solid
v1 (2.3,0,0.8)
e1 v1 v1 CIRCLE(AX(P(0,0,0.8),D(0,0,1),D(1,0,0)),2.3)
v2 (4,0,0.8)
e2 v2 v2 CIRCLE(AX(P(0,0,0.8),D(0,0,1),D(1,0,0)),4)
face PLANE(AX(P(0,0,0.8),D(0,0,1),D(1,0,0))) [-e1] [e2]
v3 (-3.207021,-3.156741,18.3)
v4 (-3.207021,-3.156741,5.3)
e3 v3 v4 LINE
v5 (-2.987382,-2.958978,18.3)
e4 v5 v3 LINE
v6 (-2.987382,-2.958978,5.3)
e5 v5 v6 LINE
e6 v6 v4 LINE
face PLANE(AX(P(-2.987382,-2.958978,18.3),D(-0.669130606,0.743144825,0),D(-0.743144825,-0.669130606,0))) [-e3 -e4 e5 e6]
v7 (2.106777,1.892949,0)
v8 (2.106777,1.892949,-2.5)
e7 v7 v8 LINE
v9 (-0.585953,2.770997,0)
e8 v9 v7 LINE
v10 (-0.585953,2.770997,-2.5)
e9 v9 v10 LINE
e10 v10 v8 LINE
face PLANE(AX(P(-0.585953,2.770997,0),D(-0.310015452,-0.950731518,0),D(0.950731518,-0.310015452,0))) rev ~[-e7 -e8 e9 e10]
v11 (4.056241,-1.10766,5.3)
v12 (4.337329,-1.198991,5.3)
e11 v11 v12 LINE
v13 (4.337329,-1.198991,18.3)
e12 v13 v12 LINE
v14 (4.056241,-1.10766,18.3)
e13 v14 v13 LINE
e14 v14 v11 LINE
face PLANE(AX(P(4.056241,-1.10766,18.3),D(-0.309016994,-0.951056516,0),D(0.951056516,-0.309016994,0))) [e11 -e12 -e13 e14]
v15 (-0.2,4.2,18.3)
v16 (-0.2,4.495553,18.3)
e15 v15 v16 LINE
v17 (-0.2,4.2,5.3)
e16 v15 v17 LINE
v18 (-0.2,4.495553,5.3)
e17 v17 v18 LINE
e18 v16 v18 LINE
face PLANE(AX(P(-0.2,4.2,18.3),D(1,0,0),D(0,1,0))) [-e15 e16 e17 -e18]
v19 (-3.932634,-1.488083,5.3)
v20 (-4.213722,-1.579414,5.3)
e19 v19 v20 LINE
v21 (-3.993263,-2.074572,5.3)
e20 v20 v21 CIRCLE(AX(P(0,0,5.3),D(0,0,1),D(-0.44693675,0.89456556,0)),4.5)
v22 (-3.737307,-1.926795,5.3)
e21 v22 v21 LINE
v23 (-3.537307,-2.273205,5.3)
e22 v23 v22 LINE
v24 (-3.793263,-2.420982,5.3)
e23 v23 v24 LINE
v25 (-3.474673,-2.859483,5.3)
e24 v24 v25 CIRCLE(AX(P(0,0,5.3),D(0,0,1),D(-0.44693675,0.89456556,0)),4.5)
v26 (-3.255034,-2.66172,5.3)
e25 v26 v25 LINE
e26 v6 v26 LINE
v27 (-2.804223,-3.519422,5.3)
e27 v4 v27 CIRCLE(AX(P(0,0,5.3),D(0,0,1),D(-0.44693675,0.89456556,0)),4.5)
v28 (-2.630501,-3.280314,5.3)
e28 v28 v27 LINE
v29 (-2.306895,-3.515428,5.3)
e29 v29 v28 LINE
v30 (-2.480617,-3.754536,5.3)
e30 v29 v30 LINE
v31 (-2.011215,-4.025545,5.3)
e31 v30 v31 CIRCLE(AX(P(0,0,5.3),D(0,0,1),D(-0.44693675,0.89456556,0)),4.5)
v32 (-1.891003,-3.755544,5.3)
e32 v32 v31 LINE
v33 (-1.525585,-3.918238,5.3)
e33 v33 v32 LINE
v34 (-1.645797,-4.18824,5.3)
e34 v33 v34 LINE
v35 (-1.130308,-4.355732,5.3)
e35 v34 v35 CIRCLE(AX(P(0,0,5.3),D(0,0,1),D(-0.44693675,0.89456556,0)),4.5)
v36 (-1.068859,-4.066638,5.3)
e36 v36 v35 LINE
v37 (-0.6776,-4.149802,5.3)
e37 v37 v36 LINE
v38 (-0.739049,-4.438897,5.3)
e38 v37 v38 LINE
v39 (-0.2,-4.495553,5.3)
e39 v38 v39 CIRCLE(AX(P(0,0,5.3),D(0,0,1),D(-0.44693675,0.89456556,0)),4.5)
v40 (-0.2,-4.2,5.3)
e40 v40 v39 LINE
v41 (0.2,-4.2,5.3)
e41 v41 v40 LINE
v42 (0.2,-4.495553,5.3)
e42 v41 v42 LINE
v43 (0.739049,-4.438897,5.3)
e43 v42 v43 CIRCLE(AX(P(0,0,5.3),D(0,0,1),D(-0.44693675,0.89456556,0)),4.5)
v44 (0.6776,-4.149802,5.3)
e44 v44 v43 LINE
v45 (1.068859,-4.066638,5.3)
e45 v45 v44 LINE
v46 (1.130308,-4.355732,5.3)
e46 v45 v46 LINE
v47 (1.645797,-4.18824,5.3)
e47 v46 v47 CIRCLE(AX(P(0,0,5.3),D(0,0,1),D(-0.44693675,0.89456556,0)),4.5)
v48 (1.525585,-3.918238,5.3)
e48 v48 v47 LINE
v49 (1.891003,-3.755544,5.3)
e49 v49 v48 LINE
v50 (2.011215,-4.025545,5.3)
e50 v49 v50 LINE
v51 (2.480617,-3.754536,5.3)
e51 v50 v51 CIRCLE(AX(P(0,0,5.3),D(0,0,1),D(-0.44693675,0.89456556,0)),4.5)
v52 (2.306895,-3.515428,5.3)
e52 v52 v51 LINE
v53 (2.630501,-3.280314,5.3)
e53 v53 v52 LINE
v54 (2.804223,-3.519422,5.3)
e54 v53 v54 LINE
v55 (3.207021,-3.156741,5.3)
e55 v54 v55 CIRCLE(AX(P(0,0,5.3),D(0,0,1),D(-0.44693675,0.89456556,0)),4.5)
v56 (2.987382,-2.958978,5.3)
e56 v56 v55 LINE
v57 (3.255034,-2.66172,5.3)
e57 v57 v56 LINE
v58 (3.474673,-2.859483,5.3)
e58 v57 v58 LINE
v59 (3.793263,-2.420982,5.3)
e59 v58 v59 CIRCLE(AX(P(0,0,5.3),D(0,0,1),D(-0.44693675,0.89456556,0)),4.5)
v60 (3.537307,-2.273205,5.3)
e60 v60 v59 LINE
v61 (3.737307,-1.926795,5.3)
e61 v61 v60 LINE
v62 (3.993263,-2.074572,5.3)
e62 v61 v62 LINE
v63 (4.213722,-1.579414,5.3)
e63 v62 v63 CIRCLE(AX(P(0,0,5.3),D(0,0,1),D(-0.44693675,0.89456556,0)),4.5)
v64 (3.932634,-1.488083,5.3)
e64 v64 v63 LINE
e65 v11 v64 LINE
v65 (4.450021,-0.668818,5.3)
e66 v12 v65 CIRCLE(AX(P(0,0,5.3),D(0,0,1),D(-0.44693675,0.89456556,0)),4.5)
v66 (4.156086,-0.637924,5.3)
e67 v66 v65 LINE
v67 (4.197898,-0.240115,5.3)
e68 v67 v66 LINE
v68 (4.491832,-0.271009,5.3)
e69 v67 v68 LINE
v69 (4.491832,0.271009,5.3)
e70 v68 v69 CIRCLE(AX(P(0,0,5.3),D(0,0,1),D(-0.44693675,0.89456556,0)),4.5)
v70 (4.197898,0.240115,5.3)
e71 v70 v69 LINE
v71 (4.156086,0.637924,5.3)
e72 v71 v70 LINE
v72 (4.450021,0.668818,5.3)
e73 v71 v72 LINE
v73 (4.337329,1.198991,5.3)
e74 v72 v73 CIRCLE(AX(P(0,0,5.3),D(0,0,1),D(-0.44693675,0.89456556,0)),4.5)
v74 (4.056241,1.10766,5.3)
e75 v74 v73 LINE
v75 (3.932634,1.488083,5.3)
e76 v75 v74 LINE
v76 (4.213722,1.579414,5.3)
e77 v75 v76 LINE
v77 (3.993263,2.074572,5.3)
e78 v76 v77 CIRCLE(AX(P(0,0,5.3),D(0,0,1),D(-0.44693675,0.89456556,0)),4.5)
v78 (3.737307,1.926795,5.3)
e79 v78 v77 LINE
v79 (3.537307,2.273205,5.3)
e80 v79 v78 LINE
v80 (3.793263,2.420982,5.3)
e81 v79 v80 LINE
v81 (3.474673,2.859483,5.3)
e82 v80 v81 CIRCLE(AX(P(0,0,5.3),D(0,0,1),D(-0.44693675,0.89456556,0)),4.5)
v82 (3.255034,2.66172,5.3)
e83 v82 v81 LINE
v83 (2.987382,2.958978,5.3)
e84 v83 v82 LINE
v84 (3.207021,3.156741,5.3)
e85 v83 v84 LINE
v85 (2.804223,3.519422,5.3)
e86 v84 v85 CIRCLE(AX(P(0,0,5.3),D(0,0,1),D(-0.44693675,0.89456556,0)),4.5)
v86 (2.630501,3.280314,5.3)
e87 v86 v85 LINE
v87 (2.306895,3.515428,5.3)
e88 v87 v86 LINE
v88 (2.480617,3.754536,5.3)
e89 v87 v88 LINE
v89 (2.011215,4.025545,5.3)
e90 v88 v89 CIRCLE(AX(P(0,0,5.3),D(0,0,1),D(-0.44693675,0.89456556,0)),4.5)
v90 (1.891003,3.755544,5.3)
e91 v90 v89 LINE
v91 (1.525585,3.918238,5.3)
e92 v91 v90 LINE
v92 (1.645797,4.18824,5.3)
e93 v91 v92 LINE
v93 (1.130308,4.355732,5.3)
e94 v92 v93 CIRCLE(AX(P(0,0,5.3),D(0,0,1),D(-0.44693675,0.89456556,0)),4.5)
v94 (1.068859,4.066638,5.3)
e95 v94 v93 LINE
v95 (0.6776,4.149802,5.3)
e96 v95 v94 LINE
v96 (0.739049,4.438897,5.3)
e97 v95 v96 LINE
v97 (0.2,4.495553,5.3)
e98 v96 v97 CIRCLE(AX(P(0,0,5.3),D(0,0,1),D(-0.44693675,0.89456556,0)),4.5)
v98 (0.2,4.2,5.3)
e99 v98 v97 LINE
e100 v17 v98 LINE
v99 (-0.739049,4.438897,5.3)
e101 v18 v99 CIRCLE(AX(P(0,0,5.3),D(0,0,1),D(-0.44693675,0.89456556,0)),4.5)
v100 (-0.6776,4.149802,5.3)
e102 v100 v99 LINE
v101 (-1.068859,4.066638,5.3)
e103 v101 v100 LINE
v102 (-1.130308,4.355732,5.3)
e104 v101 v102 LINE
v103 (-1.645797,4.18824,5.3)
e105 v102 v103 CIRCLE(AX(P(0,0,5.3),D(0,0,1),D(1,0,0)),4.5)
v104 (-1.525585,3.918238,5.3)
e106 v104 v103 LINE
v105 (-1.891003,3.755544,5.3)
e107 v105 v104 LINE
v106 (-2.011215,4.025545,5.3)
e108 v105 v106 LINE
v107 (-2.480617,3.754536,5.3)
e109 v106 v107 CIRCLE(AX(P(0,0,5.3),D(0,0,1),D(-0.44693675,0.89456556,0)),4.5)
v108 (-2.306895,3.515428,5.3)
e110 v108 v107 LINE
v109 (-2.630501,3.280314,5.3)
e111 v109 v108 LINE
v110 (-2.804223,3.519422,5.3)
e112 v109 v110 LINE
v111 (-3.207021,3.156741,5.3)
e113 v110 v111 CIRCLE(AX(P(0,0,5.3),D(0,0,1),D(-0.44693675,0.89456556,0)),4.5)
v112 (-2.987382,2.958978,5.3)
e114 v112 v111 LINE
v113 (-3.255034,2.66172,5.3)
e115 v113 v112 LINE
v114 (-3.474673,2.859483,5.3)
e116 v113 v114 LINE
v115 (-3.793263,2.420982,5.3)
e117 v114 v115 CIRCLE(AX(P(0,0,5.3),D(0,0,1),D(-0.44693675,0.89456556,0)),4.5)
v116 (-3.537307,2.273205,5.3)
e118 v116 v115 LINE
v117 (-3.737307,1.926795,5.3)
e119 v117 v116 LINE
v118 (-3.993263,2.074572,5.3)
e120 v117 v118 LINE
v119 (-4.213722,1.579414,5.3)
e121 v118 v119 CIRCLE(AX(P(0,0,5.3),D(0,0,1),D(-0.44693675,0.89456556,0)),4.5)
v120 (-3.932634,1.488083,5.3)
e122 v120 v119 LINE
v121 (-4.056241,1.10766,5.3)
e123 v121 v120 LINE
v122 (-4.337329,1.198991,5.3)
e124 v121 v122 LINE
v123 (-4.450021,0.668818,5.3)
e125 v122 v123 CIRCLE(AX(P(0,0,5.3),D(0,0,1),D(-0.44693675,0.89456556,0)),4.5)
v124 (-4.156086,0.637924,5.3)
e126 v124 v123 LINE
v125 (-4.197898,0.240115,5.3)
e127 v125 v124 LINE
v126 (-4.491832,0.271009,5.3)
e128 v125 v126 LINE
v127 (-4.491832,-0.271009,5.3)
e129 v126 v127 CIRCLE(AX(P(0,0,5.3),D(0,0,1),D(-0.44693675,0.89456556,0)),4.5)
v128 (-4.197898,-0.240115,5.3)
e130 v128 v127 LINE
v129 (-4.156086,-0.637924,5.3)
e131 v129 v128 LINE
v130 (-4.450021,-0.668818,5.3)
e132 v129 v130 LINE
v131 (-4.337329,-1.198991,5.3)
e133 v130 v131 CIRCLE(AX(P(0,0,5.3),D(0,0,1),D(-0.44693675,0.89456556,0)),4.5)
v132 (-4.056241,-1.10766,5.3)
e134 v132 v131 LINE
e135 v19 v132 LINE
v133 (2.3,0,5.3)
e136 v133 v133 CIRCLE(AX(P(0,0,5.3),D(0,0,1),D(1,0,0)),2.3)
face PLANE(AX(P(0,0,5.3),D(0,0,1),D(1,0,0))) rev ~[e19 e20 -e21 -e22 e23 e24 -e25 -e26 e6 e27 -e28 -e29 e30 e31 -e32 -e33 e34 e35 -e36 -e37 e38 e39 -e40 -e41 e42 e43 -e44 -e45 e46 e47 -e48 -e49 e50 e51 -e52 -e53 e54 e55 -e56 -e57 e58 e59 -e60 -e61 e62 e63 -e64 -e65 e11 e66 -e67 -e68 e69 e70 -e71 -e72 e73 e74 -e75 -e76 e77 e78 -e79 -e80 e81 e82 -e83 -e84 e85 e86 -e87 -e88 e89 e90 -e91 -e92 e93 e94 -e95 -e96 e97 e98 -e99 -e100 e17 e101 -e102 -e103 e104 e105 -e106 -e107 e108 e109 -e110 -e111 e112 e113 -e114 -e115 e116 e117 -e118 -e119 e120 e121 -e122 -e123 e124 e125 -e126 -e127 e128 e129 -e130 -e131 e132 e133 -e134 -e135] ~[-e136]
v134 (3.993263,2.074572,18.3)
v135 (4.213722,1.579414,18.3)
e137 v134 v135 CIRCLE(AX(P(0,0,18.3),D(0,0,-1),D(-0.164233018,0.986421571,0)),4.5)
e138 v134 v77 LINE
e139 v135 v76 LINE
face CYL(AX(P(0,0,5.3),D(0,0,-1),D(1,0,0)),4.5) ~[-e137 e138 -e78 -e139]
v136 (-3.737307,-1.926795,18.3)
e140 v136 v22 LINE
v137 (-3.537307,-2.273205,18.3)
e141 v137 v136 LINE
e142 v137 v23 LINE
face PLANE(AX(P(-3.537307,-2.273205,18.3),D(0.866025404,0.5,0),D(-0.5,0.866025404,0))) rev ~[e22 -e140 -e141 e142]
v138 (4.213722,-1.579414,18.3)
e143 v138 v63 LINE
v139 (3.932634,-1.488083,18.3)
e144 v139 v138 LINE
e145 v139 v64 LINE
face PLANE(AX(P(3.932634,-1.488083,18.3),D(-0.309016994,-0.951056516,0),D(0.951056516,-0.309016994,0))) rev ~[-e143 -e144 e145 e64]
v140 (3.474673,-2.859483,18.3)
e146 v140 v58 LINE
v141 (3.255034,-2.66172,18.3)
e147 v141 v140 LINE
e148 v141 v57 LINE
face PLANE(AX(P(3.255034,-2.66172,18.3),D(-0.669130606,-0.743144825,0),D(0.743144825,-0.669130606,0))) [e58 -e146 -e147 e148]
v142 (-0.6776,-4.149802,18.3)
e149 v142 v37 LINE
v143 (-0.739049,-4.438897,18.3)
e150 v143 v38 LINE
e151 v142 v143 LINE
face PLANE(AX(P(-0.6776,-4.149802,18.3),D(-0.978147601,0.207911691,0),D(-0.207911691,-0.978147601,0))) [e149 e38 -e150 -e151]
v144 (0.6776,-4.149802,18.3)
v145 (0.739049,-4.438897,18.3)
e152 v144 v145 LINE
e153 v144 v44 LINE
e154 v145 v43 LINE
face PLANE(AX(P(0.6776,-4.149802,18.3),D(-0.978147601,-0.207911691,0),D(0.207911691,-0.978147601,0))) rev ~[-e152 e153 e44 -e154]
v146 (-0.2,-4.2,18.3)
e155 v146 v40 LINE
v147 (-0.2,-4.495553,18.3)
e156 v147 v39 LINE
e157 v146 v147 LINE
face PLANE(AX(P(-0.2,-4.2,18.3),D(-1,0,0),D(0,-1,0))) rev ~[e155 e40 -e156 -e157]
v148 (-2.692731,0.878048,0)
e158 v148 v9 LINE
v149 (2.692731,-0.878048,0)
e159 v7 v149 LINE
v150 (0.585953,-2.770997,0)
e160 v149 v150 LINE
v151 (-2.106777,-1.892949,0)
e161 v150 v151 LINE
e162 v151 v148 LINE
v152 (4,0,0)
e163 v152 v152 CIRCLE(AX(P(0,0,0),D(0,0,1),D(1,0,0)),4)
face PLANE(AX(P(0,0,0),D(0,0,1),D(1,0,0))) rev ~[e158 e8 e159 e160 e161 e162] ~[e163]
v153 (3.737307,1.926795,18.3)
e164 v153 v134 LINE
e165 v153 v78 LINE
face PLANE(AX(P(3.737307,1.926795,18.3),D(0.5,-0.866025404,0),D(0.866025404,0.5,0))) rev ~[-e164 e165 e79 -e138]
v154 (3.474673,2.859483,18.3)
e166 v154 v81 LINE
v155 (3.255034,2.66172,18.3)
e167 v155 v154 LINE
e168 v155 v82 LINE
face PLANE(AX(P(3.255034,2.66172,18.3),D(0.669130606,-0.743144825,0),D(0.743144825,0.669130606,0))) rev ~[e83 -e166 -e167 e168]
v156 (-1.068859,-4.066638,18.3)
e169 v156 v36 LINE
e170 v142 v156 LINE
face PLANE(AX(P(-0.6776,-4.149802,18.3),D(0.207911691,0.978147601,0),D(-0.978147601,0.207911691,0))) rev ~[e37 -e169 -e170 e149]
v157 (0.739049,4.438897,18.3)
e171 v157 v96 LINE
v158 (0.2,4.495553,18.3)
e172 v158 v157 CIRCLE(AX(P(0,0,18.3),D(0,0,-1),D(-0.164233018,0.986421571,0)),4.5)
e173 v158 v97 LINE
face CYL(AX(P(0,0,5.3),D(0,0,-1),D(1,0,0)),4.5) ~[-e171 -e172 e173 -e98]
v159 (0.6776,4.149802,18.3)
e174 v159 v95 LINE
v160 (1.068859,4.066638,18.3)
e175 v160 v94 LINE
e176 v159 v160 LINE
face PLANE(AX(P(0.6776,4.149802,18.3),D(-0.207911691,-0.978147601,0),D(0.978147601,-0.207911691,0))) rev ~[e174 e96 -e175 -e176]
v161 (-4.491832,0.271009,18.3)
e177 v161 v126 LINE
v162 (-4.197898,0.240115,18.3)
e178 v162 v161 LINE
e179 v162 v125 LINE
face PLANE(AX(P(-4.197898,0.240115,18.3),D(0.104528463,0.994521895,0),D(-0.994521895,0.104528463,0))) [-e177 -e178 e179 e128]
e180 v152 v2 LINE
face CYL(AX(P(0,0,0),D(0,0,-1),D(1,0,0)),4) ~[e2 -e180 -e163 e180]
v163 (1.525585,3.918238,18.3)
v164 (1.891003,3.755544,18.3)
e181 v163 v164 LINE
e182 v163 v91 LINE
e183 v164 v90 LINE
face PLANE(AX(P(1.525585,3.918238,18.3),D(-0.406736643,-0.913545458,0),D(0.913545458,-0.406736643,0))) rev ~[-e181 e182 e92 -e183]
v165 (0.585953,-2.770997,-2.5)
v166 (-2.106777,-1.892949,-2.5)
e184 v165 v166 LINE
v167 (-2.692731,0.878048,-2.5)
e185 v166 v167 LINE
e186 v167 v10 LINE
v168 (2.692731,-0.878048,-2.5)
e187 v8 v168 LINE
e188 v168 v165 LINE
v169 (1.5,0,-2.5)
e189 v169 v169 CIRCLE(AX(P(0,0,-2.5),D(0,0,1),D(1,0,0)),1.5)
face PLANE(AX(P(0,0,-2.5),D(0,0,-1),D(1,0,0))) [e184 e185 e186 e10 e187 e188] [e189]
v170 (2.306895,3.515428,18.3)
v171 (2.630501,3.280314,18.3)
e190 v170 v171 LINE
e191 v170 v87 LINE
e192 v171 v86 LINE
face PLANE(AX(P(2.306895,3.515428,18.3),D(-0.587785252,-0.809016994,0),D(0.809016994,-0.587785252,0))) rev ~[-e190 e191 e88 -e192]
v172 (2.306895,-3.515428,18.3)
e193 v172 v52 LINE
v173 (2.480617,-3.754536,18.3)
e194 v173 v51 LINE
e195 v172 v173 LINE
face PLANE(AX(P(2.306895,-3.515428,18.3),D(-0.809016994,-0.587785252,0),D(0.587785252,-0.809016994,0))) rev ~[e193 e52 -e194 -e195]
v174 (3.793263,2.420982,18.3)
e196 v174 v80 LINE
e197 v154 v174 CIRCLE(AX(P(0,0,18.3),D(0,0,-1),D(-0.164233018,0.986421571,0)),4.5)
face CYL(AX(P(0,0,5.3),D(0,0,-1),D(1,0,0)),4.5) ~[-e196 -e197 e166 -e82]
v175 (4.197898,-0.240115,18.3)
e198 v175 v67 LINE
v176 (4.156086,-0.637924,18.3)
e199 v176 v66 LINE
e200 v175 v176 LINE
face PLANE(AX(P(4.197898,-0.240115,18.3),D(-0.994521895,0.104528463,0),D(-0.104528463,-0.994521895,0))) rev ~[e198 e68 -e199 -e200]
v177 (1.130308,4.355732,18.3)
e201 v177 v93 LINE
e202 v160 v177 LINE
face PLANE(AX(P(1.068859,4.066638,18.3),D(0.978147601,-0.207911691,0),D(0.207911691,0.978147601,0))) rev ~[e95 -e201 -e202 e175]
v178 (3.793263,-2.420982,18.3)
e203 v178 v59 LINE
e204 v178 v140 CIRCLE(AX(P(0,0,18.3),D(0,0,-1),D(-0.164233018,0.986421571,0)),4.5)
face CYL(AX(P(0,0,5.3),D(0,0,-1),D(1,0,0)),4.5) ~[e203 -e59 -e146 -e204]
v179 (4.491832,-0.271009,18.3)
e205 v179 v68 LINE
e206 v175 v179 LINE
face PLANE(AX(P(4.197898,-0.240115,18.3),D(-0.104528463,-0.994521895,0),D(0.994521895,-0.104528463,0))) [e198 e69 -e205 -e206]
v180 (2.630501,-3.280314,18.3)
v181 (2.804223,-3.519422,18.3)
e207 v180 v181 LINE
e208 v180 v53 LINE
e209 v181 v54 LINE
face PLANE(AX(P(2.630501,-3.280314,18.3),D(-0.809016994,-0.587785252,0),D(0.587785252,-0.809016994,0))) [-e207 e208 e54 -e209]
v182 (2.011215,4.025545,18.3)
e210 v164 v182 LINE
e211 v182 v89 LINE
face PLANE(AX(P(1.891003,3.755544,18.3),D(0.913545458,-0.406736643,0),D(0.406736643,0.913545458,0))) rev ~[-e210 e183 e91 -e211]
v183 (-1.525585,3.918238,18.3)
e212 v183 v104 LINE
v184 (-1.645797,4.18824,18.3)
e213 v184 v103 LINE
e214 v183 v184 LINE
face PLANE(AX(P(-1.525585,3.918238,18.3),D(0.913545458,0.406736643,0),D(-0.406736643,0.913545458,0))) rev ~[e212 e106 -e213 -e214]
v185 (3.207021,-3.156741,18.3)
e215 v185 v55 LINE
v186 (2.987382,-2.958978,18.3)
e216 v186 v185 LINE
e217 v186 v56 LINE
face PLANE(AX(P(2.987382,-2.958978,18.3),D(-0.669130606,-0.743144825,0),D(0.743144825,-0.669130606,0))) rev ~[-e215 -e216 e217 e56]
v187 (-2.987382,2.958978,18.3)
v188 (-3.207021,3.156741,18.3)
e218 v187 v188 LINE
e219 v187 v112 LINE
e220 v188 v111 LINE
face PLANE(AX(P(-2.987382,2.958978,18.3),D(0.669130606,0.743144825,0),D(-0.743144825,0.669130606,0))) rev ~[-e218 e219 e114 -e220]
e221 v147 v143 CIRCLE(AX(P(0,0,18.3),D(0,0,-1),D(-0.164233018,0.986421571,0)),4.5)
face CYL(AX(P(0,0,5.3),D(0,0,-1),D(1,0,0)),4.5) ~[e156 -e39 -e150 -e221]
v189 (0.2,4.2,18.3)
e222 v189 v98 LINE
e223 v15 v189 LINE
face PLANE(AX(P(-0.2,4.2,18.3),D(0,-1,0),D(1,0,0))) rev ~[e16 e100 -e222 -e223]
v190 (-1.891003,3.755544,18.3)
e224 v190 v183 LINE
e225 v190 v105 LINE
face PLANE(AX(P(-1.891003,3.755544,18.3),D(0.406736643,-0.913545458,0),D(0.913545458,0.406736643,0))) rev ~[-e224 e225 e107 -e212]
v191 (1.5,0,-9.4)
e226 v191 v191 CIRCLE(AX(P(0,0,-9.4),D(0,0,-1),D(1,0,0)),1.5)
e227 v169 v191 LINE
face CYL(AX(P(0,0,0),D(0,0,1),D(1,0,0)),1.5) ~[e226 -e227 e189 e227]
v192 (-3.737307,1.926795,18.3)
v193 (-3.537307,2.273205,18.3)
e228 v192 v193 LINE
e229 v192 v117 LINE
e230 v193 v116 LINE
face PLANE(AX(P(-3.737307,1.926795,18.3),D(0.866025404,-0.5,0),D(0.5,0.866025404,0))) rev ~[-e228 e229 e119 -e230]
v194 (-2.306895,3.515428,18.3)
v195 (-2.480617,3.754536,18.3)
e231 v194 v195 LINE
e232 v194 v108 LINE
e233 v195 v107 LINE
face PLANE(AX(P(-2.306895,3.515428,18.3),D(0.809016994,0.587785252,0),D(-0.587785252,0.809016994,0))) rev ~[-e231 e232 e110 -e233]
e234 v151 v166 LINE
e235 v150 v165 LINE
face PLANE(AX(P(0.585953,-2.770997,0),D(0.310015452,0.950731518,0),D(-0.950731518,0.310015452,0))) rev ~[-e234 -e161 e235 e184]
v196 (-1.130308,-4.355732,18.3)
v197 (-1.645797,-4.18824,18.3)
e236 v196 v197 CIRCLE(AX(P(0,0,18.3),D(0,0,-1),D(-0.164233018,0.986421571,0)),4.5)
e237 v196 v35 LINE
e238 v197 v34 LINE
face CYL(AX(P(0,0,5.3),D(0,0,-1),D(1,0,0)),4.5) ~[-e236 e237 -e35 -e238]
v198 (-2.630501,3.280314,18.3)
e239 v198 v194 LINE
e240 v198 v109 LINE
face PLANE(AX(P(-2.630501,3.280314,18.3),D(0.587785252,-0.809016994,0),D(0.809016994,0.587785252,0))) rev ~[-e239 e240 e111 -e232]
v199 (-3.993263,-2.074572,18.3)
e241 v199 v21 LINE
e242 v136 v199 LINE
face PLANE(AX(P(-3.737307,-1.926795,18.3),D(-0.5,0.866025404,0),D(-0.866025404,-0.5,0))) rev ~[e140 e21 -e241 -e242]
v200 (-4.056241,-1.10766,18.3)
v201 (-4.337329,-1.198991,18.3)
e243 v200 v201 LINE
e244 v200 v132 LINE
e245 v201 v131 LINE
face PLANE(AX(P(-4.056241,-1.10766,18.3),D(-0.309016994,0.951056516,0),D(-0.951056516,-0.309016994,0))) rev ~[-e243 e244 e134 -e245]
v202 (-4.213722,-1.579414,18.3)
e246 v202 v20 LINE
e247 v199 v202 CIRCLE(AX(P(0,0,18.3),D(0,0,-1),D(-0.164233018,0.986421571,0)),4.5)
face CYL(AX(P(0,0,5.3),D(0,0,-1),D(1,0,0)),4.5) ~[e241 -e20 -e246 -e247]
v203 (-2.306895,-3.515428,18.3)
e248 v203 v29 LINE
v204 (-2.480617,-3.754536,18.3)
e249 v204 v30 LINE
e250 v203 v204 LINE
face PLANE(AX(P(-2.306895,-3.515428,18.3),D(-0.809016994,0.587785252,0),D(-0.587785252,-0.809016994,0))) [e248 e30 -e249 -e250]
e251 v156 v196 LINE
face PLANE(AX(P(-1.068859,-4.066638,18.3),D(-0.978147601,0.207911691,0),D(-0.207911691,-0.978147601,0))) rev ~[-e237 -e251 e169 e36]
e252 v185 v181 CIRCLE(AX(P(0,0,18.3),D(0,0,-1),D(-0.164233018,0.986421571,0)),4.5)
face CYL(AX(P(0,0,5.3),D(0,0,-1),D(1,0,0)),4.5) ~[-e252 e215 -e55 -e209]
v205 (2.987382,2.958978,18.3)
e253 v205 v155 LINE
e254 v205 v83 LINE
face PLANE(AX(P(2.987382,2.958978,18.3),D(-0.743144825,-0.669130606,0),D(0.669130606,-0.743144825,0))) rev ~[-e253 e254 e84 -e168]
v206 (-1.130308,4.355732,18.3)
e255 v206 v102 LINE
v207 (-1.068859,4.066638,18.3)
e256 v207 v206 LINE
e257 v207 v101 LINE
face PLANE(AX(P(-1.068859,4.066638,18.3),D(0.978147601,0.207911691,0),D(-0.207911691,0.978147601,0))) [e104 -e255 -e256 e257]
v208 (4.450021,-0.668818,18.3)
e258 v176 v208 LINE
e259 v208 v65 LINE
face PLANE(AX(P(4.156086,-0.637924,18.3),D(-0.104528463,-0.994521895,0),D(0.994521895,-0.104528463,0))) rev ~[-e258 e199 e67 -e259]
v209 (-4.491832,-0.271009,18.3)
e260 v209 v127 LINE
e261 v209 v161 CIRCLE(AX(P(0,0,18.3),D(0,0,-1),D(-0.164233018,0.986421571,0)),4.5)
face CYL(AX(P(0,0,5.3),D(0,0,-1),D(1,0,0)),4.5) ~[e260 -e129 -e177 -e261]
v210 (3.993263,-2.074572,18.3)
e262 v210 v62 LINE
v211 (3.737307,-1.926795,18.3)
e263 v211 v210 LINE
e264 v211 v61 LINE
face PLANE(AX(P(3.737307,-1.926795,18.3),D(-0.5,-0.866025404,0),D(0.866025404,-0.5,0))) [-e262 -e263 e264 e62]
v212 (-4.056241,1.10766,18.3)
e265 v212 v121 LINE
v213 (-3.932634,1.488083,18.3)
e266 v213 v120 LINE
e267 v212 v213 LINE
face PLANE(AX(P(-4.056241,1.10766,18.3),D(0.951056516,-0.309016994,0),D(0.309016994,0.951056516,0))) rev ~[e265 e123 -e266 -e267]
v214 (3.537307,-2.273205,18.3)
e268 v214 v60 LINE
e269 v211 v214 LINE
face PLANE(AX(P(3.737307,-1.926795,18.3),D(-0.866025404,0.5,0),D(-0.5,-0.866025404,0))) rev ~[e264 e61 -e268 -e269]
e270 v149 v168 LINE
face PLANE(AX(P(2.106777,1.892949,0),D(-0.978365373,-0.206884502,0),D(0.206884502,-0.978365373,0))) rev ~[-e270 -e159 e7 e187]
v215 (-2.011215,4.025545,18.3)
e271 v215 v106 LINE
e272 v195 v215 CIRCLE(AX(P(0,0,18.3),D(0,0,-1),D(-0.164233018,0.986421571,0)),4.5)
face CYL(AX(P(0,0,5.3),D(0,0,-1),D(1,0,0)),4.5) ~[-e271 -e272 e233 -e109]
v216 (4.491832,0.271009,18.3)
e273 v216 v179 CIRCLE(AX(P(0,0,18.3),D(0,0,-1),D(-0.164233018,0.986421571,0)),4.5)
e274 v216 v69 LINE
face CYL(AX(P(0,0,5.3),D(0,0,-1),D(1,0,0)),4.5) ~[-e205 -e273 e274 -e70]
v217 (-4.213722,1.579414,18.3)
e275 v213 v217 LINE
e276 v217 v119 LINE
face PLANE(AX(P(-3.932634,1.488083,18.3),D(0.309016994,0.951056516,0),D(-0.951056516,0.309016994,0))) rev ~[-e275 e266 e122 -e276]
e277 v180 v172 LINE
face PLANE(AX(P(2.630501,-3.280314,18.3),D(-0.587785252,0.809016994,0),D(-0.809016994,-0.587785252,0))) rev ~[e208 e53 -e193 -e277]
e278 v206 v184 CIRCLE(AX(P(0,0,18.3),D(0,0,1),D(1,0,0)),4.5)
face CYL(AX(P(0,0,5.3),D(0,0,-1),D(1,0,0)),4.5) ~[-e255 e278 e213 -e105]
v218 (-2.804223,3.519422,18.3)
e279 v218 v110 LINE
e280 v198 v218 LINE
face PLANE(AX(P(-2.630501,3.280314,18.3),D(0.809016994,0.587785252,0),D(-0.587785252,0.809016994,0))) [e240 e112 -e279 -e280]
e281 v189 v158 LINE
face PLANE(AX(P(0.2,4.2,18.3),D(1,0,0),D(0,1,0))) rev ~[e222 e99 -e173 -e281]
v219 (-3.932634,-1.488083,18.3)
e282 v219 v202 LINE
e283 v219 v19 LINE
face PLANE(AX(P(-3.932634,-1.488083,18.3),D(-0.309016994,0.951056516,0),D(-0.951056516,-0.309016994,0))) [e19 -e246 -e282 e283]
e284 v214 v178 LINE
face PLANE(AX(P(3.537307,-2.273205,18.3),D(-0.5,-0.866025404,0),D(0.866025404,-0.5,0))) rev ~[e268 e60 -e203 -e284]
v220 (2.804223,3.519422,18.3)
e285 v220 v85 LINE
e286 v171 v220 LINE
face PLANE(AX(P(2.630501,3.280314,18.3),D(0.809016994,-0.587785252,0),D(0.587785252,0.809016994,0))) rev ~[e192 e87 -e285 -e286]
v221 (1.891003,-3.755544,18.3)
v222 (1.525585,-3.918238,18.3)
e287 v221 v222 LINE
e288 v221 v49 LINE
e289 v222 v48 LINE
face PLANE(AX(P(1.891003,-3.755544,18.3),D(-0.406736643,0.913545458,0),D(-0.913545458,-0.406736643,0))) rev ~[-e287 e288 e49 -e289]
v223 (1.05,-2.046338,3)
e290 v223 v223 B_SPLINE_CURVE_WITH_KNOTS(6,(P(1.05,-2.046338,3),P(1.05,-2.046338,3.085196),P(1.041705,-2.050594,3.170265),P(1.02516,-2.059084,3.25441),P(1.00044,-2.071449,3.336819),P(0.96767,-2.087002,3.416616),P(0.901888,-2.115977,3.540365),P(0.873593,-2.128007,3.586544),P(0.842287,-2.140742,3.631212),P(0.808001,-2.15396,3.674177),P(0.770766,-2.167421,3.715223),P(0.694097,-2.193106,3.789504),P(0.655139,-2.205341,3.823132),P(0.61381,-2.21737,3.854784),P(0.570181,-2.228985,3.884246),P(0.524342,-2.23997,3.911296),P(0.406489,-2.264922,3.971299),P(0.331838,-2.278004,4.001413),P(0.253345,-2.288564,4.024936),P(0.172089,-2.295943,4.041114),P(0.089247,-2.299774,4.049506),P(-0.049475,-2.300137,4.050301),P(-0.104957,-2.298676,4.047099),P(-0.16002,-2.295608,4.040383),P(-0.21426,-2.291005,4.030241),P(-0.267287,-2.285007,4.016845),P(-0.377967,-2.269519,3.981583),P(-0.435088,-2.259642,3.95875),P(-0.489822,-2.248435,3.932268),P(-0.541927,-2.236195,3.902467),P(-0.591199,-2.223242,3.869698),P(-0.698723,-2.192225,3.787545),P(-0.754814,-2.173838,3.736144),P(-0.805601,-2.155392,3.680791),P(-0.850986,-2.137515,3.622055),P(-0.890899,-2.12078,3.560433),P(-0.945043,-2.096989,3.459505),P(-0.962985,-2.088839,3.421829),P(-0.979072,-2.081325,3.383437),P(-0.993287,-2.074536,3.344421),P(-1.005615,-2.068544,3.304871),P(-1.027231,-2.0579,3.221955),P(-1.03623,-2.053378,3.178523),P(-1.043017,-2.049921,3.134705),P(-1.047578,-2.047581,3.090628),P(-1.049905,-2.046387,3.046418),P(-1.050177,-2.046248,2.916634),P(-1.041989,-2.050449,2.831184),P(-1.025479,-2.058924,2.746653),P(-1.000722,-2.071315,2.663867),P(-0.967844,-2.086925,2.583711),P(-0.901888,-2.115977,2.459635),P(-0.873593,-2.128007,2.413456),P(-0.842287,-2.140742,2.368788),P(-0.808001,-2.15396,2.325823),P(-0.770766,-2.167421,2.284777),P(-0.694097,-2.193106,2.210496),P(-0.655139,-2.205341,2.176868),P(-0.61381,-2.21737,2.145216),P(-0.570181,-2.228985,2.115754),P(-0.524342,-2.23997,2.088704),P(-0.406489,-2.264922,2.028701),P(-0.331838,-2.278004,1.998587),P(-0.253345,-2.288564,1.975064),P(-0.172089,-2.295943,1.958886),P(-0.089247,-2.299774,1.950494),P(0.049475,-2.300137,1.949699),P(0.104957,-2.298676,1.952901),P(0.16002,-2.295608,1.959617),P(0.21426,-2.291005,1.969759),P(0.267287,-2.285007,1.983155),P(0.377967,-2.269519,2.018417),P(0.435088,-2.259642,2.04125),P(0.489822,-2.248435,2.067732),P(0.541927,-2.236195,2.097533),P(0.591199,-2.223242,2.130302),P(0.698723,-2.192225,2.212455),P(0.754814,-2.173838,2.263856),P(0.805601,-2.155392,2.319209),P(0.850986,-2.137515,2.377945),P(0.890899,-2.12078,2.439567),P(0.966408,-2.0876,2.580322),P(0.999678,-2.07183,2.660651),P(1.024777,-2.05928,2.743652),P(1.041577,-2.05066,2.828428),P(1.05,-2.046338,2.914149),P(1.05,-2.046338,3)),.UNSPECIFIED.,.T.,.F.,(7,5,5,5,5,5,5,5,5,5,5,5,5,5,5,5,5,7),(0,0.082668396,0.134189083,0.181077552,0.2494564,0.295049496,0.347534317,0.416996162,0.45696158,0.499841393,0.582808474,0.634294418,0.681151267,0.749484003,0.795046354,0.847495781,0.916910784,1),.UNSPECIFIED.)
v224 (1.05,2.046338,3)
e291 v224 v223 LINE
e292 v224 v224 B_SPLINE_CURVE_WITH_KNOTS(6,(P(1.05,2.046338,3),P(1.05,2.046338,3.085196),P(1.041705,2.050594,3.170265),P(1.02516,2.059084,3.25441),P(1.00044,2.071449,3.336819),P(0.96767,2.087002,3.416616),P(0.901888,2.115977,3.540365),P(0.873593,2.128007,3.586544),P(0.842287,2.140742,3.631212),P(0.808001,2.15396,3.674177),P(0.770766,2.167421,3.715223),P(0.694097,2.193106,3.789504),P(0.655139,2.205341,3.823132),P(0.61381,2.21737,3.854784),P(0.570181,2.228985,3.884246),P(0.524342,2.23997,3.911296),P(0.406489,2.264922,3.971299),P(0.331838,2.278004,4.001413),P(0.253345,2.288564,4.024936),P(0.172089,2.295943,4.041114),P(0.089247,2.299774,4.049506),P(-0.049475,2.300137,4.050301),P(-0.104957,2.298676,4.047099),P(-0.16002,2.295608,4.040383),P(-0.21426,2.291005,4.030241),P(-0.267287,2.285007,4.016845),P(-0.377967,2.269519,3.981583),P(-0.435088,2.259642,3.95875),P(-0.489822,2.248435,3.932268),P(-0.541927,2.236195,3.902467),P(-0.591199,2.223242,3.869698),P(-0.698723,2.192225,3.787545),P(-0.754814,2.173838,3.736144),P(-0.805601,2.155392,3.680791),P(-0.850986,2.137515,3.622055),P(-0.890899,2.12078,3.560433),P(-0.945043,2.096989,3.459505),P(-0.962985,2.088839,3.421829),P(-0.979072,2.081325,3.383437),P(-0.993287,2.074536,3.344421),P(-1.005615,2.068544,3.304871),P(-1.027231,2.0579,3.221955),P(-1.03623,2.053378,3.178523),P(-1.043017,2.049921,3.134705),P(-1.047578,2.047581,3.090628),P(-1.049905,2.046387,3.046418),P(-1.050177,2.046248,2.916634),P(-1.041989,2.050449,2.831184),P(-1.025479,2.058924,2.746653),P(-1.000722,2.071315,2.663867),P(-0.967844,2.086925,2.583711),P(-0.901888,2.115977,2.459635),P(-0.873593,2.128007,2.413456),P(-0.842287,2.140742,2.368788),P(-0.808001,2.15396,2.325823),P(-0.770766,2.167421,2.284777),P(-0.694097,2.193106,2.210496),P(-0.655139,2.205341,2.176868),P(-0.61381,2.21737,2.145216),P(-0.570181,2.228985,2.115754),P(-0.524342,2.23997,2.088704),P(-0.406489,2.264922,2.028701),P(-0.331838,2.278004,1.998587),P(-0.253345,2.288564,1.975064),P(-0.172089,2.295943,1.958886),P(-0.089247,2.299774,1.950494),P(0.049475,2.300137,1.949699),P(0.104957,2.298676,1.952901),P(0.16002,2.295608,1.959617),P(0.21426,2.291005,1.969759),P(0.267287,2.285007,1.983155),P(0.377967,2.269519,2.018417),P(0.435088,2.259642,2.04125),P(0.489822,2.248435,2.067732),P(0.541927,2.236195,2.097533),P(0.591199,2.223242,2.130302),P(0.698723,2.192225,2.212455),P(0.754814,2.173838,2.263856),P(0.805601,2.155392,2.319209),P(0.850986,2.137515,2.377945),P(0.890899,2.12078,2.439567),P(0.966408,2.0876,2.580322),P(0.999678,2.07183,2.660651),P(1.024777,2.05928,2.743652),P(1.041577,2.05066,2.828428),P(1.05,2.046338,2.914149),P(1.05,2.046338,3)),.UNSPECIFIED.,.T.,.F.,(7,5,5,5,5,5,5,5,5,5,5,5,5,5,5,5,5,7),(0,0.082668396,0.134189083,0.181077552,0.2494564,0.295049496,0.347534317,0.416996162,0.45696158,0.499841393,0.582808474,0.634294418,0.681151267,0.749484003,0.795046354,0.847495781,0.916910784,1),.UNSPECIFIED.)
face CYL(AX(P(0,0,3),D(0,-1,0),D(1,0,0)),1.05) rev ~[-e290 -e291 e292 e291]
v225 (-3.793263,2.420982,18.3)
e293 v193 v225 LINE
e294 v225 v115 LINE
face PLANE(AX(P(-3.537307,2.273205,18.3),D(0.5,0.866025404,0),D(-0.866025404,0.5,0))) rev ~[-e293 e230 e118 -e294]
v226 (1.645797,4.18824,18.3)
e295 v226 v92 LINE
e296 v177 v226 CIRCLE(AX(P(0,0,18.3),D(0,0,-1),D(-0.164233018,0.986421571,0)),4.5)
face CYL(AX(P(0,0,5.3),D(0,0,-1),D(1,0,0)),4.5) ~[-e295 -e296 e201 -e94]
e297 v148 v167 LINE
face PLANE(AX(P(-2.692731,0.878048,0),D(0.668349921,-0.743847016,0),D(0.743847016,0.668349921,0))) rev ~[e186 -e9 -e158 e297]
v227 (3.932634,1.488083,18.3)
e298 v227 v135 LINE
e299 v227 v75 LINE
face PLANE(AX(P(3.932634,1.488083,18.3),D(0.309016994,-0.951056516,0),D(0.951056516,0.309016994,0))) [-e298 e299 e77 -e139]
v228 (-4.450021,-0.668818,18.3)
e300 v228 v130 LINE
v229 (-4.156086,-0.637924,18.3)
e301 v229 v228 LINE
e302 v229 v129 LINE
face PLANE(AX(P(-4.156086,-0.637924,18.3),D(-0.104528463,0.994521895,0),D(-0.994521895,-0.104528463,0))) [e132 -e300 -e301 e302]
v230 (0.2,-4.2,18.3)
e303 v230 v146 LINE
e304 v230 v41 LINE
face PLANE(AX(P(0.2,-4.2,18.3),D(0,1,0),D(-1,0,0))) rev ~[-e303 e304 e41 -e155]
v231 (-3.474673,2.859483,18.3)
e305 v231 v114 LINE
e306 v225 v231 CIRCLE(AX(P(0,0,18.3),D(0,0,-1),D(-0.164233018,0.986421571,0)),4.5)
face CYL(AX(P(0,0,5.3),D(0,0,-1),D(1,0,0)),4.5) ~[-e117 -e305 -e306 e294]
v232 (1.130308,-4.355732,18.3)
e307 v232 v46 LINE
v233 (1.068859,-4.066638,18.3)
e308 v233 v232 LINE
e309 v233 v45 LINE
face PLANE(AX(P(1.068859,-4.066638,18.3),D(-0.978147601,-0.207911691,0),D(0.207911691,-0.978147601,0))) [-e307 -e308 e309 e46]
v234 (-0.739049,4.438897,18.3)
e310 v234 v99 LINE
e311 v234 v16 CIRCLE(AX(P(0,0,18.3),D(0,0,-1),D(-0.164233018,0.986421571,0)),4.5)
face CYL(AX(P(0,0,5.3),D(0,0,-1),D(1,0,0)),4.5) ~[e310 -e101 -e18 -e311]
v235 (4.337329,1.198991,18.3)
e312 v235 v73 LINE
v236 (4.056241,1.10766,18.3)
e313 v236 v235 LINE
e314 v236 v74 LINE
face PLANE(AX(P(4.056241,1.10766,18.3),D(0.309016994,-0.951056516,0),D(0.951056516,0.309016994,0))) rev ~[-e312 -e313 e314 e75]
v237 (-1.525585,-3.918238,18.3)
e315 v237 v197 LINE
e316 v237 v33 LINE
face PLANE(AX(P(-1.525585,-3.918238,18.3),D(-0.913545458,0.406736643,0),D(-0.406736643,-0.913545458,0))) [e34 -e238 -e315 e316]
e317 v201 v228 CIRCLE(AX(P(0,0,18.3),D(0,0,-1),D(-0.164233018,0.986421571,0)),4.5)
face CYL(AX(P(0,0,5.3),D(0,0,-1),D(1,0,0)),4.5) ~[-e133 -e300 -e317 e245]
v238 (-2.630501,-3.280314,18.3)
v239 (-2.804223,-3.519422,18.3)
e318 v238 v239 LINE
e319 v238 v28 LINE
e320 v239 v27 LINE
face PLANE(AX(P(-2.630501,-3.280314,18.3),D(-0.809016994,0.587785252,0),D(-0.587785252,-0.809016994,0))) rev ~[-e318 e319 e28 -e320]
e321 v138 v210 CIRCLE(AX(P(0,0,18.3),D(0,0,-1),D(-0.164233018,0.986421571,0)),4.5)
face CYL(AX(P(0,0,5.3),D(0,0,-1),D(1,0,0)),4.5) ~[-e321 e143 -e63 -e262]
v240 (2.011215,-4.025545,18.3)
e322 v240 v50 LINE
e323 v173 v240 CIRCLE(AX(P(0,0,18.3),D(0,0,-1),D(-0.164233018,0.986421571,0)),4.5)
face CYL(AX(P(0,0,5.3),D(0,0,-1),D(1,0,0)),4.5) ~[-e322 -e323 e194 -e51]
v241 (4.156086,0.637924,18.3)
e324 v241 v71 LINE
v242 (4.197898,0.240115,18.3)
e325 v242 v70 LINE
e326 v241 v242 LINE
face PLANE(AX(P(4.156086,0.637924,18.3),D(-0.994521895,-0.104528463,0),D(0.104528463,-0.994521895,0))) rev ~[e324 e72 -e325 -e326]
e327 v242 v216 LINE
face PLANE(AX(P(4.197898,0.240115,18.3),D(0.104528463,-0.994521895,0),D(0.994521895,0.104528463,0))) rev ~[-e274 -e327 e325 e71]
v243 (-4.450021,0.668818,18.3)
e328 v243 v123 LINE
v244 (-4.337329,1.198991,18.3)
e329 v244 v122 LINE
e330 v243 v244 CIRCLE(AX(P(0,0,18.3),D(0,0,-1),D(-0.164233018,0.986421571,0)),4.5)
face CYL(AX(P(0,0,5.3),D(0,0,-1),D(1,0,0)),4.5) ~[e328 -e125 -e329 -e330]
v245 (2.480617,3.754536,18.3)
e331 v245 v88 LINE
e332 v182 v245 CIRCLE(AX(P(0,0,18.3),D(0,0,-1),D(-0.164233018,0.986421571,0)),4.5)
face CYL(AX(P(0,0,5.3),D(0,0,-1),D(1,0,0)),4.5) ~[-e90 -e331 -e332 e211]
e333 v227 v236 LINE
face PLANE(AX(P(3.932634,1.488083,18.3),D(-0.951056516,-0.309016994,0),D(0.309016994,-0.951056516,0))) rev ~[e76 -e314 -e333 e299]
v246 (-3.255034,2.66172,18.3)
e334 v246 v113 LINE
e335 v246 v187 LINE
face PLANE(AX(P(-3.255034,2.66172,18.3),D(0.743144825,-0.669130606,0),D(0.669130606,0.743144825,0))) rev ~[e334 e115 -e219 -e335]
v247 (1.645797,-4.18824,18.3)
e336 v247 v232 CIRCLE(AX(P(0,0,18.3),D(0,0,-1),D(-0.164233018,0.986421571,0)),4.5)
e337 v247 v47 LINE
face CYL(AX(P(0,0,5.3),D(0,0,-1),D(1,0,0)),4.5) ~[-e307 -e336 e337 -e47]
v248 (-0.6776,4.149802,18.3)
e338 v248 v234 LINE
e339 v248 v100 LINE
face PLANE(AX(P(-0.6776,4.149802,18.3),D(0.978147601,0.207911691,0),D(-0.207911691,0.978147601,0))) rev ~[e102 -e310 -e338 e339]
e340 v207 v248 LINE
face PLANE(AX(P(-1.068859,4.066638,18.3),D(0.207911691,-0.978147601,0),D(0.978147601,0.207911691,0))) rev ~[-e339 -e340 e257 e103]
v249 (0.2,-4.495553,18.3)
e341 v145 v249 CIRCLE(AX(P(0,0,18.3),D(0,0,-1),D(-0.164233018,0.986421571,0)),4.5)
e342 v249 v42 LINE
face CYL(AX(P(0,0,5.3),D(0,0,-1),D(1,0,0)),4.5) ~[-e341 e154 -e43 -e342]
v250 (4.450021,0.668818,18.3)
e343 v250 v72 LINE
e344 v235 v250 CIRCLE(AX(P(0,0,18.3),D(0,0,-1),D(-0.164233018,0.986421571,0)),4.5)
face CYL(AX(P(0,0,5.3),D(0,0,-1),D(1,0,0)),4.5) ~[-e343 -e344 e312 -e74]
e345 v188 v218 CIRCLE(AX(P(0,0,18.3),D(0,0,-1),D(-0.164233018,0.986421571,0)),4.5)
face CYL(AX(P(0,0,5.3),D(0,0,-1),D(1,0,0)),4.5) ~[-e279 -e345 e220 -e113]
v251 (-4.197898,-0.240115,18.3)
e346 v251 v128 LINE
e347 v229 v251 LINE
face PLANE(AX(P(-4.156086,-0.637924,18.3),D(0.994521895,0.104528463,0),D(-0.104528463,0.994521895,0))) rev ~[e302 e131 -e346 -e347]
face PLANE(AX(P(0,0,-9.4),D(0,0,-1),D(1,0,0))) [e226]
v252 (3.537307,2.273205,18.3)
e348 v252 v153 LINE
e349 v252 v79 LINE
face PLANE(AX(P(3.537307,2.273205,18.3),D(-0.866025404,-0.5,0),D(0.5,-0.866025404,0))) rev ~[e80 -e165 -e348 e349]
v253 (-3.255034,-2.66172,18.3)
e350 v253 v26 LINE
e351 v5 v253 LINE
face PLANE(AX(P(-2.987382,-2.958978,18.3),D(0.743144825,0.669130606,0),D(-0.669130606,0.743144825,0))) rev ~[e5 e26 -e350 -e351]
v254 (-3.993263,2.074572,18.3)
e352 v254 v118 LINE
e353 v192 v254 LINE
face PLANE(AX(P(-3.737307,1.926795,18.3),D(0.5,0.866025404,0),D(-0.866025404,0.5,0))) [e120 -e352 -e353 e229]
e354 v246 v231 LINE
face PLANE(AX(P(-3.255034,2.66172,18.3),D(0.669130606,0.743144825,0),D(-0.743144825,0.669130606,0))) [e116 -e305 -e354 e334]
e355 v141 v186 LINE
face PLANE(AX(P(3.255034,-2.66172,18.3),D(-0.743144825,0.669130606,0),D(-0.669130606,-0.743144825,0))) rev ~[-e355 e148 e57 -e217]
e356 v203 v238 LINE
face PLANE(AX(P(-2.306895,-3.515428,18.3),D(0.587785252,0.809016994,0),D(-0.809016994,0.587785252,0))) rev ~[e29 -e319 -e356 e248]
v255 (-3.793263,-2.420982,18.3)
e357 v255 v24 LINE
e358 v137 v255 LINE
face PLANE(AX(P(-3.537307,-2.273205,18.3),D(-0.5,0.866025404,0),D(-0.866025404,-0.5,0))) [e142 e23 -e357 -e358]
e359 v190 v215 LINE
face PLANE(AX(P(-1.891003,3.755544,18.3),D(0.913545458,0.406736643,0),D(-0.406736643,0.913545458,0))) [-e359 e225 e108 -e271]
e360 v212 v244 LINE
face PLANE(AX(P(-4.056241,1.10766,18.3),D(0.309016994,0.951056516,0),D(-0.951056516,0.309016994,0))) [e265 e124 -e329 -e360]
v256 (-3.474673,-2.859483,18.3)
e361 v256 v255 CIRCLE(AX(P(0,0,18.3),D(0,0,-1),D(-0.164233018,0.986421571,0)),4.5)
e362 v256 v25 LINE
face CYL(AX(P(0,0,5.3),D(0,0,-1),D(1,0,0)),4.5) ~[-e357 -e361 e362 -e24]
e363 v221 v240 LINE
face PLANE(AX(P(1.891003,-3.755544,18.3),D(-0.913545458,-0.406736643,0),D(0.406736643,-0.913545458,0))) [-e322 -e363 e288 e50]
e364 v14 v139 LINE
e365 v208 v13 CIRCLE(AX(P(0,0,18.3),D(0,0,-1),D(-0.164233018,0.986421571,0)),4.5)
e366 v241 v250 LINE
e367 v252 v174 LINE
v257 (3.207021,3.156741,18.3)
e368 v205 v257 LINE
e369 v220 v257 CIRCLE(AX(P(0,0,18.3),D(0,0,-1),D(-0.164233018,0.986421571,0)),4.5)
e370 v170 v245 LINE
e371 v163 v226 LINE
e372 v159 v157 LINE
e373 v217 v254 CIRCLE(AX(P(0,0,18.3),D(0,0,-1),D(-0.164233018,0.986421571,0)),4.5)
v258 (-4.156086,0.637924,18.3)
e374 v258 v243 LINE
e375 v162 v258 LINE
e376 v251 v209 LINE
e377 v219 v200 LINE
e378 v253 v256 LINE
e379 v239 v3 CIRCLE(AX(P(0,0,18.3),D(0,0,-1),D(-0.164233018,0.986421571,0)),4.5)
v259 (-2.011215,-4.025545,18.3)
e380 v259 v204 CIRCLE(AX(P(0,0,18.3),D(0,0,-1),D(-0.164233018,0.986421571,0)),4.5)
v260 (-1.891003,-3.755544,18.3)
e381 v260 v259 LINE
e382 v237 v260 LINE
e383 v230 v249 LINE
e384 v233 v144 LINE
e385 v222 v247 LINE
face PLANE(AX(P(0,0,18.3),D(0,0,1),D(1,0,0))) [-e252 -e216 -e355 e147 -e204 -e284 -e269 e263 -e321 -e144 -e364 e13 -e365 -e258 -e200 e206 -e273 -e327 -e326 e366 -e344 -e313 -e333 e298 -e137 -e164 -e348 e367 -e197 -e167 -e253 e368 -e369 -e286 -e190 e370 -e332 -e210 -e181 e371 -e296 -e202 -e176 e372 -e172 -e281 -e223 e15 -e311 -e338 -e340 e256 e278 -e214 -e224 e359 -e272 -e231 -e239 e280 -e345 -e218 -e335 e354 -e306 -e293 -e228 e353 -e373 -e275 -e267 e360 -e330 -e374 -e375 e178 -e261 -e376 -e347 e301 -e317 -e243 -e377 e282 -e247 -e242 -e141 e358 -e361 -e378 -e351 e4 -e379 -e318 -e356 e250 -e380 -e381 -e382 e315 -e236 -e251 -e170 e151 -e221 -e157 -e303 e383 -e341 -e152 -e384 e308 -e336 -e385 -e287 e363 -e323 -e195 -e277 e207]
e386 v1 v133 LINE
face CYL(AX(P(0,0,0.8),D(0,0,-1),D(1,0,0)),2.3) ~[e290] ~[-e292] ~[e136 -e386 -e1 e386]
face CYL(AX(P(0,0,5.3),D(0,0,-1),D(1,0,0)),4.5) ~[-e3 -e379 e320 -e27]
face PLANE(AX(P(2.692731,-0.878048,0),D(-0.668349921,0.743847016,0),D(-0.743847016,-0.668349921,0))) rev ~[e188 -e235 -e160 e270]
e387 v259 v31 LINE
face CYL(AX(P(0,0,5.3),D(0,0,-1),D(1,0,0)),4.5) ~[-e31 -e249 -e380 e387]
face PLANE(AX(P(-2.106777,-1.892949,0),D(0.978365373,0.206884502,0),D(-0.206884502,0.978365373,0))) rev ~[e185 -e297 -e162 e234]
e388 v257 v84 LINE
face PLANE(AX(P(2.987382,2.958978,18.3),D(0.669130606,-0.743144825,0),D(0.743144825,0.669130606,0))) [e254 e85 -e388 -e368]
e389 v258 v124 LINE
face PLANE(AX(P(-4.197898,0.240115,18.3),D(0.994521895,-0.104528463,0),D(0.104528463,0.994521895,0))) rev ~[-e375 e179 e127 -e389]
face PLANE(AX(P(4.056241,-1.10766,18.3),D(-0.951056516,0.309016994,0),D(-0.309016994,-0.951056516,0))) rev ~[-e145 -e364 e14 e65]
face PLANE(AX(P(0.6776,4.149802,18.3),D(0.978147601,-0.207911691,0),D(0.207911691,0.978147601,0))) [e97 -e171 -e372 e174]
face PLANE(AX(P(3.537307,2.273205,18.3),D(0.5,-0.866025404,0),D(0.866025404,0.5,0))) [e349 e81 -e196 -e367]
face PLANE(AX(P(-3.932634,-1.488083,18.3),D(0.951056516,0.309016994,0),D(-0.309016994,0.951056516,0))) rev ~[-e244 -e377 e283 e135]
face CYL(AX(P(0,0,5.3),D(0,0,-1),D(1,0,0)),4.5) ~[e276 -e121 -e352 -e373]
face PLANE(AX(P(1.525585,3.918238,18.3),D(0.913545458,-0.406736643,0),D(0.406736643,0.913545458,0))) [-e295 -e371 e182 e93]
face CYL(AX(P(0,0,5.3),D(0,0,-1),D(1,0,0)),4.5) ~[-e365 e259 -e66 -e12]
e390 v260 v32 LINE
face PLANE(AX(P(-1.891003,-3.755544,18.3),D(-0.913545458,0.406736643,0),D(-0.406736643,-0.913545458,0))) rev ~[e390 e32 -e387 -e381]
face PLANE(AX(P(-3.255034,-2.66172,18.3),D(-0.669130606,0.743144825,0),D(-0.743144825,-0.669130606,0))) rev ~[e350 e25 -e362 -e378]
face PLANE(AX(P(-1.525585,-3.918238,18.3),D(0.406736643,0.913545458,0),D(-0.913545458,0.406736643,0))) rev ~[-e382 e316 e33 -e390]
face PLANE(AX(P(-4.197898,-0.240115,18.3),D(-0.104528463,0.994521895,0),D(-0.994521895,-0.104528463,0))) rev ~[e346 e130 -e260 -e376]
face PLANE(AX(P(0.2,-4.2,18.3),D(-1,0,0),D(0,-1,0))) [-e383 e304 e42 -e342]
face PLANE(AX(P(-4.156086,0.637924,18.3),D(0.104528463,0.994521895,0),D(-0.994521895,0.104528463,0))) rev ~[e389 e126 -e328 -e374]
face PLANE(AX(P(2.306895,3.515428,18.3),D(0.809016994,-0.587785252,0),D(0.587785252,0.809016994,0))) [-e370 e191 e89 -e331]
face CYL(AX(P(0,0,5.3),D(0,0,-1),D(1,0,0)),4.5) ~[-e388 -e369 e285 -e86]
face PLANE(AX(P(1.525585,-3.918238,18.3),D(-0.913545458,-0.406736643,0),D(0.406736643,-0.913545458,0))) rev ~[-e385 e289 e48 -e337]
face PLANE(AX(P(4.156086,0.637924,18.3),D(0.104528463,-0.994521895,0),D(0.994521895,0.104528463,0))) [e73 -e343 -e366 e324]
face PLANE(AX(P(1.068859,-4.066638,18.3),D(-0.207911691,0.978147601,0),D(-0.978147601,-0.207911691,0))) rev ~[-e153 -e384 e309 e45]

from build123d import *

# Parameters (mm, degrees)
F0_R      = 4
F1_DEPTH  = 0.8
F2_R      = 2.3
F3_DEPTH  = 4.5
F4_R      = 4.5
F5_DEPTH  = 13
F6_R      = 1.5
F7_DEPTH  = 9.4
F8_R      = 1.05
F9_DEPTH  = 12.5
F10_W     = 0.4
F10_H     = 0.6
F11_DEPTH = 25
F12_COUNT = 30
F15_DEPTH = 2.5


with BuildPart() as f1:
    # F0 (on Top) → F1 (new body)
    with BuildSketch(Plane.XY):
        Circle(F0_R)
    extrude(amount=F1_DEPTH)

    # F2 (on face) → F3 (join)
    with BuildSketch(Plane.XY.offset(0.8)):
        Circle(F2_R)
    extrude(amount=F3_DEPTH)

    # F4 (on face) → F5 (join)
    with BuildSketch(Plane.XY.offset(5.3)):
        Circle(F4_R)
    extrude(amount=F5_DEPTH)

    # F6 (on face) → F7 (join)
    with BuildSketch(Plane(origin=(0, 0, 0), x_dir=(1, 0, 0), z_dir=(0, 0, -1))):
        Circle(F6_R)
    extrude(amount=F7_DEPTH)

    # F8 (on Front) → F9 (cut, symmetric)
    with BuildSketch(Plane.XZ):
        with Locations((0, 3)):
            Circle(F8_R)
    extrude(amount=F9_DEPTH, both=True, mode=Mode.SUBTRACT)


with BuildPart() as f11:
    # F10 (on face) → F11 (new body)
    with BuildSketch(Plane.XY.offset(18.3)):
        with Locations((0, 4.5)):
            Rectangle(F10_W, F10_H)
    extrude(amount=-F11_DEPTH)


with BuildPart() as f12_1:
    # F12: instance of F11
    add(f11.part.rotate(Axis((0, 0, 18.3), (0, 0, 1)), 1 * 360 / F12_COUNT))


with BuildPart() as f12_2:
    # F12: instance of F11
    add(f11.part.rotate(Axis((0, 0, 18.3), (0, 0, 1)), 2 * 360 / F12_COUNT))


with BuildPart() as f12_3:
    # F12: instance of F11
    add(f11.part.rotate(Axis((0, 0, 18.3), (0, 0, 1)), 3 * 360 / F12_COUNT))


with BuildPart() as f12_4:
    # F12: instance of F11
    add(f11.part.rotate(Axis((0, 0, 18.3), (0, 0, 1)), 4 * 360 / F12_COUNT))


with BuildPart() as f12_5:
    # F12: instance of F11
    add(f11.part.rotate(Axis((0, 0, 18.3), (0, 0, 1)), 5 * 360 / F12_COUNT))


with BuildPart() as f12_6:
    # F12: instance of F11
    add(f11.part.rotate(Axis((0, 0, 18.3), (0, 0, 1)), 6 * 360 / F12_COUNT))


with BuildPart() as f12_7:
    # F12: instance of F11
    add(f11.part.rotate(Axis((0, 0, 18.3), (0, 0, 1)), 7 * 360 / F12_COUNT))


with BuildPart() as f12_8:
    # F12: instance of F11
    add(f11.part.rotate(Axis((0, 0, 18.3), (0, 0, 1)), 8 * 360 / F12_COUNT))


with BuildPart() as f12_9:
    # F12: instance of F11
    add(f11.part.rotate(Axis((0, 0, 18.3), (0, 0, 1)), 9 * 360 / F12_COUNT))


with BuildPart() as f12_10:
    # F12: instance of F11
    add(f11.part.rotate(Axis((0, 0, 18.3), (0, 0, 1)), 10 * 360 / F12_COUNT))


with BuildPart() as f12_11:
    # F12: instance of F11
    add(f11.part.rotate(Axis((0, 0, 18.3), (0, 0, 1)), 11 * 360 / F12_COUNT))


with BuildPart() as f12_12:
    # F12: instance of F11
    add(f11.part.rotate(Axis((0, 0, 18.3), (0, 0, 1)), 12 * 360 / F12_COUNT))


with BuildPart() as f12_13:
    # F12: instance of F11
    add(f11.part.rotate(Axis((0, 0, 18.3), (0, 0, 1)), 13 * 360 / F12_COUNT))


with BuildPart() as f12_14:
    # F12: instance of F11
    add(f11.part.rotate(Axis((0, 0, 18.3), (0, 0, 1)), 14 * 360 / F12_COUNT))


with BuildPart() as f12_15:
    # F12: instance of F11
    add(f11.part.rotate(Axis((0, 0, 18.3), (0, 0, 1)), 15 * 360 / F12_COUNT))


with BuildPart() as f12_16:
    # F12: instance of F11
    add(f11.part.rotate(Axis((0, 0, 18.3), (0, 0, 1)), 16 * 360 / F12_COUNT))


with BuildPart() as f12_17:
    # F12: instance of F11
    add(f11.part.rotate(Axis((0, 0, 18.3), (0, 0, 1)), 17 * 360 / F12_COUNT))


with BuildPart() as f12_18:
    # F12: instance of F11
    add(f11.part.rotate(Axis((0, 0, 18.3), (0, 0, 1)), 18 * 360 / F12_COUNT))


with BuildPart() as f12_19:
    # F12: instance of F11
    add(f11.part.rotate(Axis((0, 0, 18.3), (0, 0, 1)), 19 * 360 / F12_COUNT))


with BuildPart() as f12_20:
    # F12: instance of F11
    add(f11.part.rotate(Axis((0, 0, 18.3), (0, 0, 1)), 20 * 360 / F12_COUNT))


with BuildPart() as f12_21:
    # F12: instance of F11
    add(f11.part.rotate(Axis((0, 0, 18.3), (0, 0, 1)), 21 * 360 / F12_COUNT))


with BuildPart() as f12_22:
    # F12: instance of F11
    add(f11.part.rotate(Axis((0, 0, 18.3), (0, 0, 1)), 22 * 360 / F12_COUNT))


with BuildPart() as f12_23:
    # F12: instance of F11
    add(f11.part.rotate(Axis((0, 0, 18.3), (0, 0, 1)), 23 * 360 / F12_COUNT))


with BuildPart() as f12_24:
    # F12: instance of F11
    add(f11.part.rotate(Axis((0, 0, 18.3), (0, 0, 1)), 24 * 360 / F12_COUNT))


with BuildPart() as f12_25:
    # F12: instance of F11
    add(f11.part.rotate(Axis((0, 0, 18.3), (0, 0, 1)), 25 * 360 / F12_COUNT))


with BuildPart() as f12_26:
    # F12: instance of F11
    add(f11.part.rotate(Axis((0, 0, 18.3), (0, 0, 1)), 26 * 360 / F12_COUNT))


with BuildPart() as f12_27:
    # F12: instance of F11
    add(f11.part.rotate(Axis((0, 0, 18.3), (0, 0, 1)), 27 * 360 / F12_COUNT))


with BuildPart() as f12_28:
    # F12: instance of F11
    add(f11.part.rotate(Axis((0, 0, 18.3), (0, 0, 1)), 28 * 360 / F12_COUNT))


with BuildPart() as f12_29:
    # F12: instance of F11
    add(f11.part.rotate(Axis((0, 0, 18.3), (0, 0, 1)), 29 * 360 / F12_COUNT))


with BuildPart() as f1_1:
    add(f1.part)

    # F13: cut F12_1, F12_2, F12_3, F12_4, F12_5, F12_6, F12_7, F12_8, F12_9, F12_10, F12_11, F12_12, F12_13, F12_14, F12_15, F12_16, F12_17, F12_18, F12_19, F12_20, F12_21, F12_22, F12_23, F12_24, F12_25, F12_26, F12_27, F12_28, F12_29, F11
    add(f12_1.part, mode=Mode.SUBTRACT)
    add(f12_2.part, mode=Mode.SUBTRACT)
    add(f12_3.part, mode=Mode.SUBTRACT)
    add(f12_4.part, mode=Mode.SUBTRACT)
    add(f12_5.part, mode=Mode.SUBTRACT)
    add(f12_6.part, mode=Mode.SUBTRACT)
    add(f12_7.part, mode=Mode.SUBTRACT)
    add(f12_8.part, mode=Mode.SUBTRACT)
    add(f12_9.part, mode=Mode.SUBTRACT)
    add(f12_10.part, mode=Mode.SUBTRACT)
    add(f12_11.part, mode=Mode.SUBTRACT)
    add(f12_12.part, mode=Mode.SUBTRACT)
    add(f12_13.part, mode=Mode.SUBTRACT)
    add(f12_14.part, mode=Mode.SUBTRACT)
    add(f12_15.part, mode=Mode.SUBTRACT)
    add(f12_16.part, mode=Mode.SUBTRACT)
    add(f12_17.part, mode=Mode.SUBTRACT)
    add(f12_18.part, mode=Mode.SUBTRACT)
    add(f12_19.part, mode=Mode.SUBTRACT)
    add(f12_20.part, mode=Mode.SUBTRACT)
    add(f12_21.part, mode=Mode.SUBTRACT)
    add(f12_22.part, mode=Mode.SUBTRACT)
    add(f12_23.part, mode=Mode.SUBTRACT)
    add(f12_24.part, mode=Mode.SUBTRACT)
    add(f12_25.part, mode=Mode.SUBTRACT)
    add(f12_26.part, mode=Mode.SUBTRACT)
    add(f12_27.part, mode=Mode.SUBTRACT)
    add(f12_28.part, mode=Mode.SUBTRACT)
    add(f12_29.part, mode=Mode.SUBTRACT)
    add(f11.part, mode=Mode.SUBTRACT)

    # F14 (on face) → F15 (join)
    with BuildSketch(Plane(origin=(0, 0, 0), x_dir=(1, 0, 0), z_dir=(0, 0, -1))):
        Polygon((-2.6927305179, -0.8780481684), (-0.5859532394, -2.7709971182), (2.1067772785, -1.8929489498), (2.6927305179, 0.8780481684), (0.5859532394, 2.7709971182), (-2.1067772785, 1.8929489498), align=None)
    extrude(amount=F15_DEPTH)


solid = f1_1.part
